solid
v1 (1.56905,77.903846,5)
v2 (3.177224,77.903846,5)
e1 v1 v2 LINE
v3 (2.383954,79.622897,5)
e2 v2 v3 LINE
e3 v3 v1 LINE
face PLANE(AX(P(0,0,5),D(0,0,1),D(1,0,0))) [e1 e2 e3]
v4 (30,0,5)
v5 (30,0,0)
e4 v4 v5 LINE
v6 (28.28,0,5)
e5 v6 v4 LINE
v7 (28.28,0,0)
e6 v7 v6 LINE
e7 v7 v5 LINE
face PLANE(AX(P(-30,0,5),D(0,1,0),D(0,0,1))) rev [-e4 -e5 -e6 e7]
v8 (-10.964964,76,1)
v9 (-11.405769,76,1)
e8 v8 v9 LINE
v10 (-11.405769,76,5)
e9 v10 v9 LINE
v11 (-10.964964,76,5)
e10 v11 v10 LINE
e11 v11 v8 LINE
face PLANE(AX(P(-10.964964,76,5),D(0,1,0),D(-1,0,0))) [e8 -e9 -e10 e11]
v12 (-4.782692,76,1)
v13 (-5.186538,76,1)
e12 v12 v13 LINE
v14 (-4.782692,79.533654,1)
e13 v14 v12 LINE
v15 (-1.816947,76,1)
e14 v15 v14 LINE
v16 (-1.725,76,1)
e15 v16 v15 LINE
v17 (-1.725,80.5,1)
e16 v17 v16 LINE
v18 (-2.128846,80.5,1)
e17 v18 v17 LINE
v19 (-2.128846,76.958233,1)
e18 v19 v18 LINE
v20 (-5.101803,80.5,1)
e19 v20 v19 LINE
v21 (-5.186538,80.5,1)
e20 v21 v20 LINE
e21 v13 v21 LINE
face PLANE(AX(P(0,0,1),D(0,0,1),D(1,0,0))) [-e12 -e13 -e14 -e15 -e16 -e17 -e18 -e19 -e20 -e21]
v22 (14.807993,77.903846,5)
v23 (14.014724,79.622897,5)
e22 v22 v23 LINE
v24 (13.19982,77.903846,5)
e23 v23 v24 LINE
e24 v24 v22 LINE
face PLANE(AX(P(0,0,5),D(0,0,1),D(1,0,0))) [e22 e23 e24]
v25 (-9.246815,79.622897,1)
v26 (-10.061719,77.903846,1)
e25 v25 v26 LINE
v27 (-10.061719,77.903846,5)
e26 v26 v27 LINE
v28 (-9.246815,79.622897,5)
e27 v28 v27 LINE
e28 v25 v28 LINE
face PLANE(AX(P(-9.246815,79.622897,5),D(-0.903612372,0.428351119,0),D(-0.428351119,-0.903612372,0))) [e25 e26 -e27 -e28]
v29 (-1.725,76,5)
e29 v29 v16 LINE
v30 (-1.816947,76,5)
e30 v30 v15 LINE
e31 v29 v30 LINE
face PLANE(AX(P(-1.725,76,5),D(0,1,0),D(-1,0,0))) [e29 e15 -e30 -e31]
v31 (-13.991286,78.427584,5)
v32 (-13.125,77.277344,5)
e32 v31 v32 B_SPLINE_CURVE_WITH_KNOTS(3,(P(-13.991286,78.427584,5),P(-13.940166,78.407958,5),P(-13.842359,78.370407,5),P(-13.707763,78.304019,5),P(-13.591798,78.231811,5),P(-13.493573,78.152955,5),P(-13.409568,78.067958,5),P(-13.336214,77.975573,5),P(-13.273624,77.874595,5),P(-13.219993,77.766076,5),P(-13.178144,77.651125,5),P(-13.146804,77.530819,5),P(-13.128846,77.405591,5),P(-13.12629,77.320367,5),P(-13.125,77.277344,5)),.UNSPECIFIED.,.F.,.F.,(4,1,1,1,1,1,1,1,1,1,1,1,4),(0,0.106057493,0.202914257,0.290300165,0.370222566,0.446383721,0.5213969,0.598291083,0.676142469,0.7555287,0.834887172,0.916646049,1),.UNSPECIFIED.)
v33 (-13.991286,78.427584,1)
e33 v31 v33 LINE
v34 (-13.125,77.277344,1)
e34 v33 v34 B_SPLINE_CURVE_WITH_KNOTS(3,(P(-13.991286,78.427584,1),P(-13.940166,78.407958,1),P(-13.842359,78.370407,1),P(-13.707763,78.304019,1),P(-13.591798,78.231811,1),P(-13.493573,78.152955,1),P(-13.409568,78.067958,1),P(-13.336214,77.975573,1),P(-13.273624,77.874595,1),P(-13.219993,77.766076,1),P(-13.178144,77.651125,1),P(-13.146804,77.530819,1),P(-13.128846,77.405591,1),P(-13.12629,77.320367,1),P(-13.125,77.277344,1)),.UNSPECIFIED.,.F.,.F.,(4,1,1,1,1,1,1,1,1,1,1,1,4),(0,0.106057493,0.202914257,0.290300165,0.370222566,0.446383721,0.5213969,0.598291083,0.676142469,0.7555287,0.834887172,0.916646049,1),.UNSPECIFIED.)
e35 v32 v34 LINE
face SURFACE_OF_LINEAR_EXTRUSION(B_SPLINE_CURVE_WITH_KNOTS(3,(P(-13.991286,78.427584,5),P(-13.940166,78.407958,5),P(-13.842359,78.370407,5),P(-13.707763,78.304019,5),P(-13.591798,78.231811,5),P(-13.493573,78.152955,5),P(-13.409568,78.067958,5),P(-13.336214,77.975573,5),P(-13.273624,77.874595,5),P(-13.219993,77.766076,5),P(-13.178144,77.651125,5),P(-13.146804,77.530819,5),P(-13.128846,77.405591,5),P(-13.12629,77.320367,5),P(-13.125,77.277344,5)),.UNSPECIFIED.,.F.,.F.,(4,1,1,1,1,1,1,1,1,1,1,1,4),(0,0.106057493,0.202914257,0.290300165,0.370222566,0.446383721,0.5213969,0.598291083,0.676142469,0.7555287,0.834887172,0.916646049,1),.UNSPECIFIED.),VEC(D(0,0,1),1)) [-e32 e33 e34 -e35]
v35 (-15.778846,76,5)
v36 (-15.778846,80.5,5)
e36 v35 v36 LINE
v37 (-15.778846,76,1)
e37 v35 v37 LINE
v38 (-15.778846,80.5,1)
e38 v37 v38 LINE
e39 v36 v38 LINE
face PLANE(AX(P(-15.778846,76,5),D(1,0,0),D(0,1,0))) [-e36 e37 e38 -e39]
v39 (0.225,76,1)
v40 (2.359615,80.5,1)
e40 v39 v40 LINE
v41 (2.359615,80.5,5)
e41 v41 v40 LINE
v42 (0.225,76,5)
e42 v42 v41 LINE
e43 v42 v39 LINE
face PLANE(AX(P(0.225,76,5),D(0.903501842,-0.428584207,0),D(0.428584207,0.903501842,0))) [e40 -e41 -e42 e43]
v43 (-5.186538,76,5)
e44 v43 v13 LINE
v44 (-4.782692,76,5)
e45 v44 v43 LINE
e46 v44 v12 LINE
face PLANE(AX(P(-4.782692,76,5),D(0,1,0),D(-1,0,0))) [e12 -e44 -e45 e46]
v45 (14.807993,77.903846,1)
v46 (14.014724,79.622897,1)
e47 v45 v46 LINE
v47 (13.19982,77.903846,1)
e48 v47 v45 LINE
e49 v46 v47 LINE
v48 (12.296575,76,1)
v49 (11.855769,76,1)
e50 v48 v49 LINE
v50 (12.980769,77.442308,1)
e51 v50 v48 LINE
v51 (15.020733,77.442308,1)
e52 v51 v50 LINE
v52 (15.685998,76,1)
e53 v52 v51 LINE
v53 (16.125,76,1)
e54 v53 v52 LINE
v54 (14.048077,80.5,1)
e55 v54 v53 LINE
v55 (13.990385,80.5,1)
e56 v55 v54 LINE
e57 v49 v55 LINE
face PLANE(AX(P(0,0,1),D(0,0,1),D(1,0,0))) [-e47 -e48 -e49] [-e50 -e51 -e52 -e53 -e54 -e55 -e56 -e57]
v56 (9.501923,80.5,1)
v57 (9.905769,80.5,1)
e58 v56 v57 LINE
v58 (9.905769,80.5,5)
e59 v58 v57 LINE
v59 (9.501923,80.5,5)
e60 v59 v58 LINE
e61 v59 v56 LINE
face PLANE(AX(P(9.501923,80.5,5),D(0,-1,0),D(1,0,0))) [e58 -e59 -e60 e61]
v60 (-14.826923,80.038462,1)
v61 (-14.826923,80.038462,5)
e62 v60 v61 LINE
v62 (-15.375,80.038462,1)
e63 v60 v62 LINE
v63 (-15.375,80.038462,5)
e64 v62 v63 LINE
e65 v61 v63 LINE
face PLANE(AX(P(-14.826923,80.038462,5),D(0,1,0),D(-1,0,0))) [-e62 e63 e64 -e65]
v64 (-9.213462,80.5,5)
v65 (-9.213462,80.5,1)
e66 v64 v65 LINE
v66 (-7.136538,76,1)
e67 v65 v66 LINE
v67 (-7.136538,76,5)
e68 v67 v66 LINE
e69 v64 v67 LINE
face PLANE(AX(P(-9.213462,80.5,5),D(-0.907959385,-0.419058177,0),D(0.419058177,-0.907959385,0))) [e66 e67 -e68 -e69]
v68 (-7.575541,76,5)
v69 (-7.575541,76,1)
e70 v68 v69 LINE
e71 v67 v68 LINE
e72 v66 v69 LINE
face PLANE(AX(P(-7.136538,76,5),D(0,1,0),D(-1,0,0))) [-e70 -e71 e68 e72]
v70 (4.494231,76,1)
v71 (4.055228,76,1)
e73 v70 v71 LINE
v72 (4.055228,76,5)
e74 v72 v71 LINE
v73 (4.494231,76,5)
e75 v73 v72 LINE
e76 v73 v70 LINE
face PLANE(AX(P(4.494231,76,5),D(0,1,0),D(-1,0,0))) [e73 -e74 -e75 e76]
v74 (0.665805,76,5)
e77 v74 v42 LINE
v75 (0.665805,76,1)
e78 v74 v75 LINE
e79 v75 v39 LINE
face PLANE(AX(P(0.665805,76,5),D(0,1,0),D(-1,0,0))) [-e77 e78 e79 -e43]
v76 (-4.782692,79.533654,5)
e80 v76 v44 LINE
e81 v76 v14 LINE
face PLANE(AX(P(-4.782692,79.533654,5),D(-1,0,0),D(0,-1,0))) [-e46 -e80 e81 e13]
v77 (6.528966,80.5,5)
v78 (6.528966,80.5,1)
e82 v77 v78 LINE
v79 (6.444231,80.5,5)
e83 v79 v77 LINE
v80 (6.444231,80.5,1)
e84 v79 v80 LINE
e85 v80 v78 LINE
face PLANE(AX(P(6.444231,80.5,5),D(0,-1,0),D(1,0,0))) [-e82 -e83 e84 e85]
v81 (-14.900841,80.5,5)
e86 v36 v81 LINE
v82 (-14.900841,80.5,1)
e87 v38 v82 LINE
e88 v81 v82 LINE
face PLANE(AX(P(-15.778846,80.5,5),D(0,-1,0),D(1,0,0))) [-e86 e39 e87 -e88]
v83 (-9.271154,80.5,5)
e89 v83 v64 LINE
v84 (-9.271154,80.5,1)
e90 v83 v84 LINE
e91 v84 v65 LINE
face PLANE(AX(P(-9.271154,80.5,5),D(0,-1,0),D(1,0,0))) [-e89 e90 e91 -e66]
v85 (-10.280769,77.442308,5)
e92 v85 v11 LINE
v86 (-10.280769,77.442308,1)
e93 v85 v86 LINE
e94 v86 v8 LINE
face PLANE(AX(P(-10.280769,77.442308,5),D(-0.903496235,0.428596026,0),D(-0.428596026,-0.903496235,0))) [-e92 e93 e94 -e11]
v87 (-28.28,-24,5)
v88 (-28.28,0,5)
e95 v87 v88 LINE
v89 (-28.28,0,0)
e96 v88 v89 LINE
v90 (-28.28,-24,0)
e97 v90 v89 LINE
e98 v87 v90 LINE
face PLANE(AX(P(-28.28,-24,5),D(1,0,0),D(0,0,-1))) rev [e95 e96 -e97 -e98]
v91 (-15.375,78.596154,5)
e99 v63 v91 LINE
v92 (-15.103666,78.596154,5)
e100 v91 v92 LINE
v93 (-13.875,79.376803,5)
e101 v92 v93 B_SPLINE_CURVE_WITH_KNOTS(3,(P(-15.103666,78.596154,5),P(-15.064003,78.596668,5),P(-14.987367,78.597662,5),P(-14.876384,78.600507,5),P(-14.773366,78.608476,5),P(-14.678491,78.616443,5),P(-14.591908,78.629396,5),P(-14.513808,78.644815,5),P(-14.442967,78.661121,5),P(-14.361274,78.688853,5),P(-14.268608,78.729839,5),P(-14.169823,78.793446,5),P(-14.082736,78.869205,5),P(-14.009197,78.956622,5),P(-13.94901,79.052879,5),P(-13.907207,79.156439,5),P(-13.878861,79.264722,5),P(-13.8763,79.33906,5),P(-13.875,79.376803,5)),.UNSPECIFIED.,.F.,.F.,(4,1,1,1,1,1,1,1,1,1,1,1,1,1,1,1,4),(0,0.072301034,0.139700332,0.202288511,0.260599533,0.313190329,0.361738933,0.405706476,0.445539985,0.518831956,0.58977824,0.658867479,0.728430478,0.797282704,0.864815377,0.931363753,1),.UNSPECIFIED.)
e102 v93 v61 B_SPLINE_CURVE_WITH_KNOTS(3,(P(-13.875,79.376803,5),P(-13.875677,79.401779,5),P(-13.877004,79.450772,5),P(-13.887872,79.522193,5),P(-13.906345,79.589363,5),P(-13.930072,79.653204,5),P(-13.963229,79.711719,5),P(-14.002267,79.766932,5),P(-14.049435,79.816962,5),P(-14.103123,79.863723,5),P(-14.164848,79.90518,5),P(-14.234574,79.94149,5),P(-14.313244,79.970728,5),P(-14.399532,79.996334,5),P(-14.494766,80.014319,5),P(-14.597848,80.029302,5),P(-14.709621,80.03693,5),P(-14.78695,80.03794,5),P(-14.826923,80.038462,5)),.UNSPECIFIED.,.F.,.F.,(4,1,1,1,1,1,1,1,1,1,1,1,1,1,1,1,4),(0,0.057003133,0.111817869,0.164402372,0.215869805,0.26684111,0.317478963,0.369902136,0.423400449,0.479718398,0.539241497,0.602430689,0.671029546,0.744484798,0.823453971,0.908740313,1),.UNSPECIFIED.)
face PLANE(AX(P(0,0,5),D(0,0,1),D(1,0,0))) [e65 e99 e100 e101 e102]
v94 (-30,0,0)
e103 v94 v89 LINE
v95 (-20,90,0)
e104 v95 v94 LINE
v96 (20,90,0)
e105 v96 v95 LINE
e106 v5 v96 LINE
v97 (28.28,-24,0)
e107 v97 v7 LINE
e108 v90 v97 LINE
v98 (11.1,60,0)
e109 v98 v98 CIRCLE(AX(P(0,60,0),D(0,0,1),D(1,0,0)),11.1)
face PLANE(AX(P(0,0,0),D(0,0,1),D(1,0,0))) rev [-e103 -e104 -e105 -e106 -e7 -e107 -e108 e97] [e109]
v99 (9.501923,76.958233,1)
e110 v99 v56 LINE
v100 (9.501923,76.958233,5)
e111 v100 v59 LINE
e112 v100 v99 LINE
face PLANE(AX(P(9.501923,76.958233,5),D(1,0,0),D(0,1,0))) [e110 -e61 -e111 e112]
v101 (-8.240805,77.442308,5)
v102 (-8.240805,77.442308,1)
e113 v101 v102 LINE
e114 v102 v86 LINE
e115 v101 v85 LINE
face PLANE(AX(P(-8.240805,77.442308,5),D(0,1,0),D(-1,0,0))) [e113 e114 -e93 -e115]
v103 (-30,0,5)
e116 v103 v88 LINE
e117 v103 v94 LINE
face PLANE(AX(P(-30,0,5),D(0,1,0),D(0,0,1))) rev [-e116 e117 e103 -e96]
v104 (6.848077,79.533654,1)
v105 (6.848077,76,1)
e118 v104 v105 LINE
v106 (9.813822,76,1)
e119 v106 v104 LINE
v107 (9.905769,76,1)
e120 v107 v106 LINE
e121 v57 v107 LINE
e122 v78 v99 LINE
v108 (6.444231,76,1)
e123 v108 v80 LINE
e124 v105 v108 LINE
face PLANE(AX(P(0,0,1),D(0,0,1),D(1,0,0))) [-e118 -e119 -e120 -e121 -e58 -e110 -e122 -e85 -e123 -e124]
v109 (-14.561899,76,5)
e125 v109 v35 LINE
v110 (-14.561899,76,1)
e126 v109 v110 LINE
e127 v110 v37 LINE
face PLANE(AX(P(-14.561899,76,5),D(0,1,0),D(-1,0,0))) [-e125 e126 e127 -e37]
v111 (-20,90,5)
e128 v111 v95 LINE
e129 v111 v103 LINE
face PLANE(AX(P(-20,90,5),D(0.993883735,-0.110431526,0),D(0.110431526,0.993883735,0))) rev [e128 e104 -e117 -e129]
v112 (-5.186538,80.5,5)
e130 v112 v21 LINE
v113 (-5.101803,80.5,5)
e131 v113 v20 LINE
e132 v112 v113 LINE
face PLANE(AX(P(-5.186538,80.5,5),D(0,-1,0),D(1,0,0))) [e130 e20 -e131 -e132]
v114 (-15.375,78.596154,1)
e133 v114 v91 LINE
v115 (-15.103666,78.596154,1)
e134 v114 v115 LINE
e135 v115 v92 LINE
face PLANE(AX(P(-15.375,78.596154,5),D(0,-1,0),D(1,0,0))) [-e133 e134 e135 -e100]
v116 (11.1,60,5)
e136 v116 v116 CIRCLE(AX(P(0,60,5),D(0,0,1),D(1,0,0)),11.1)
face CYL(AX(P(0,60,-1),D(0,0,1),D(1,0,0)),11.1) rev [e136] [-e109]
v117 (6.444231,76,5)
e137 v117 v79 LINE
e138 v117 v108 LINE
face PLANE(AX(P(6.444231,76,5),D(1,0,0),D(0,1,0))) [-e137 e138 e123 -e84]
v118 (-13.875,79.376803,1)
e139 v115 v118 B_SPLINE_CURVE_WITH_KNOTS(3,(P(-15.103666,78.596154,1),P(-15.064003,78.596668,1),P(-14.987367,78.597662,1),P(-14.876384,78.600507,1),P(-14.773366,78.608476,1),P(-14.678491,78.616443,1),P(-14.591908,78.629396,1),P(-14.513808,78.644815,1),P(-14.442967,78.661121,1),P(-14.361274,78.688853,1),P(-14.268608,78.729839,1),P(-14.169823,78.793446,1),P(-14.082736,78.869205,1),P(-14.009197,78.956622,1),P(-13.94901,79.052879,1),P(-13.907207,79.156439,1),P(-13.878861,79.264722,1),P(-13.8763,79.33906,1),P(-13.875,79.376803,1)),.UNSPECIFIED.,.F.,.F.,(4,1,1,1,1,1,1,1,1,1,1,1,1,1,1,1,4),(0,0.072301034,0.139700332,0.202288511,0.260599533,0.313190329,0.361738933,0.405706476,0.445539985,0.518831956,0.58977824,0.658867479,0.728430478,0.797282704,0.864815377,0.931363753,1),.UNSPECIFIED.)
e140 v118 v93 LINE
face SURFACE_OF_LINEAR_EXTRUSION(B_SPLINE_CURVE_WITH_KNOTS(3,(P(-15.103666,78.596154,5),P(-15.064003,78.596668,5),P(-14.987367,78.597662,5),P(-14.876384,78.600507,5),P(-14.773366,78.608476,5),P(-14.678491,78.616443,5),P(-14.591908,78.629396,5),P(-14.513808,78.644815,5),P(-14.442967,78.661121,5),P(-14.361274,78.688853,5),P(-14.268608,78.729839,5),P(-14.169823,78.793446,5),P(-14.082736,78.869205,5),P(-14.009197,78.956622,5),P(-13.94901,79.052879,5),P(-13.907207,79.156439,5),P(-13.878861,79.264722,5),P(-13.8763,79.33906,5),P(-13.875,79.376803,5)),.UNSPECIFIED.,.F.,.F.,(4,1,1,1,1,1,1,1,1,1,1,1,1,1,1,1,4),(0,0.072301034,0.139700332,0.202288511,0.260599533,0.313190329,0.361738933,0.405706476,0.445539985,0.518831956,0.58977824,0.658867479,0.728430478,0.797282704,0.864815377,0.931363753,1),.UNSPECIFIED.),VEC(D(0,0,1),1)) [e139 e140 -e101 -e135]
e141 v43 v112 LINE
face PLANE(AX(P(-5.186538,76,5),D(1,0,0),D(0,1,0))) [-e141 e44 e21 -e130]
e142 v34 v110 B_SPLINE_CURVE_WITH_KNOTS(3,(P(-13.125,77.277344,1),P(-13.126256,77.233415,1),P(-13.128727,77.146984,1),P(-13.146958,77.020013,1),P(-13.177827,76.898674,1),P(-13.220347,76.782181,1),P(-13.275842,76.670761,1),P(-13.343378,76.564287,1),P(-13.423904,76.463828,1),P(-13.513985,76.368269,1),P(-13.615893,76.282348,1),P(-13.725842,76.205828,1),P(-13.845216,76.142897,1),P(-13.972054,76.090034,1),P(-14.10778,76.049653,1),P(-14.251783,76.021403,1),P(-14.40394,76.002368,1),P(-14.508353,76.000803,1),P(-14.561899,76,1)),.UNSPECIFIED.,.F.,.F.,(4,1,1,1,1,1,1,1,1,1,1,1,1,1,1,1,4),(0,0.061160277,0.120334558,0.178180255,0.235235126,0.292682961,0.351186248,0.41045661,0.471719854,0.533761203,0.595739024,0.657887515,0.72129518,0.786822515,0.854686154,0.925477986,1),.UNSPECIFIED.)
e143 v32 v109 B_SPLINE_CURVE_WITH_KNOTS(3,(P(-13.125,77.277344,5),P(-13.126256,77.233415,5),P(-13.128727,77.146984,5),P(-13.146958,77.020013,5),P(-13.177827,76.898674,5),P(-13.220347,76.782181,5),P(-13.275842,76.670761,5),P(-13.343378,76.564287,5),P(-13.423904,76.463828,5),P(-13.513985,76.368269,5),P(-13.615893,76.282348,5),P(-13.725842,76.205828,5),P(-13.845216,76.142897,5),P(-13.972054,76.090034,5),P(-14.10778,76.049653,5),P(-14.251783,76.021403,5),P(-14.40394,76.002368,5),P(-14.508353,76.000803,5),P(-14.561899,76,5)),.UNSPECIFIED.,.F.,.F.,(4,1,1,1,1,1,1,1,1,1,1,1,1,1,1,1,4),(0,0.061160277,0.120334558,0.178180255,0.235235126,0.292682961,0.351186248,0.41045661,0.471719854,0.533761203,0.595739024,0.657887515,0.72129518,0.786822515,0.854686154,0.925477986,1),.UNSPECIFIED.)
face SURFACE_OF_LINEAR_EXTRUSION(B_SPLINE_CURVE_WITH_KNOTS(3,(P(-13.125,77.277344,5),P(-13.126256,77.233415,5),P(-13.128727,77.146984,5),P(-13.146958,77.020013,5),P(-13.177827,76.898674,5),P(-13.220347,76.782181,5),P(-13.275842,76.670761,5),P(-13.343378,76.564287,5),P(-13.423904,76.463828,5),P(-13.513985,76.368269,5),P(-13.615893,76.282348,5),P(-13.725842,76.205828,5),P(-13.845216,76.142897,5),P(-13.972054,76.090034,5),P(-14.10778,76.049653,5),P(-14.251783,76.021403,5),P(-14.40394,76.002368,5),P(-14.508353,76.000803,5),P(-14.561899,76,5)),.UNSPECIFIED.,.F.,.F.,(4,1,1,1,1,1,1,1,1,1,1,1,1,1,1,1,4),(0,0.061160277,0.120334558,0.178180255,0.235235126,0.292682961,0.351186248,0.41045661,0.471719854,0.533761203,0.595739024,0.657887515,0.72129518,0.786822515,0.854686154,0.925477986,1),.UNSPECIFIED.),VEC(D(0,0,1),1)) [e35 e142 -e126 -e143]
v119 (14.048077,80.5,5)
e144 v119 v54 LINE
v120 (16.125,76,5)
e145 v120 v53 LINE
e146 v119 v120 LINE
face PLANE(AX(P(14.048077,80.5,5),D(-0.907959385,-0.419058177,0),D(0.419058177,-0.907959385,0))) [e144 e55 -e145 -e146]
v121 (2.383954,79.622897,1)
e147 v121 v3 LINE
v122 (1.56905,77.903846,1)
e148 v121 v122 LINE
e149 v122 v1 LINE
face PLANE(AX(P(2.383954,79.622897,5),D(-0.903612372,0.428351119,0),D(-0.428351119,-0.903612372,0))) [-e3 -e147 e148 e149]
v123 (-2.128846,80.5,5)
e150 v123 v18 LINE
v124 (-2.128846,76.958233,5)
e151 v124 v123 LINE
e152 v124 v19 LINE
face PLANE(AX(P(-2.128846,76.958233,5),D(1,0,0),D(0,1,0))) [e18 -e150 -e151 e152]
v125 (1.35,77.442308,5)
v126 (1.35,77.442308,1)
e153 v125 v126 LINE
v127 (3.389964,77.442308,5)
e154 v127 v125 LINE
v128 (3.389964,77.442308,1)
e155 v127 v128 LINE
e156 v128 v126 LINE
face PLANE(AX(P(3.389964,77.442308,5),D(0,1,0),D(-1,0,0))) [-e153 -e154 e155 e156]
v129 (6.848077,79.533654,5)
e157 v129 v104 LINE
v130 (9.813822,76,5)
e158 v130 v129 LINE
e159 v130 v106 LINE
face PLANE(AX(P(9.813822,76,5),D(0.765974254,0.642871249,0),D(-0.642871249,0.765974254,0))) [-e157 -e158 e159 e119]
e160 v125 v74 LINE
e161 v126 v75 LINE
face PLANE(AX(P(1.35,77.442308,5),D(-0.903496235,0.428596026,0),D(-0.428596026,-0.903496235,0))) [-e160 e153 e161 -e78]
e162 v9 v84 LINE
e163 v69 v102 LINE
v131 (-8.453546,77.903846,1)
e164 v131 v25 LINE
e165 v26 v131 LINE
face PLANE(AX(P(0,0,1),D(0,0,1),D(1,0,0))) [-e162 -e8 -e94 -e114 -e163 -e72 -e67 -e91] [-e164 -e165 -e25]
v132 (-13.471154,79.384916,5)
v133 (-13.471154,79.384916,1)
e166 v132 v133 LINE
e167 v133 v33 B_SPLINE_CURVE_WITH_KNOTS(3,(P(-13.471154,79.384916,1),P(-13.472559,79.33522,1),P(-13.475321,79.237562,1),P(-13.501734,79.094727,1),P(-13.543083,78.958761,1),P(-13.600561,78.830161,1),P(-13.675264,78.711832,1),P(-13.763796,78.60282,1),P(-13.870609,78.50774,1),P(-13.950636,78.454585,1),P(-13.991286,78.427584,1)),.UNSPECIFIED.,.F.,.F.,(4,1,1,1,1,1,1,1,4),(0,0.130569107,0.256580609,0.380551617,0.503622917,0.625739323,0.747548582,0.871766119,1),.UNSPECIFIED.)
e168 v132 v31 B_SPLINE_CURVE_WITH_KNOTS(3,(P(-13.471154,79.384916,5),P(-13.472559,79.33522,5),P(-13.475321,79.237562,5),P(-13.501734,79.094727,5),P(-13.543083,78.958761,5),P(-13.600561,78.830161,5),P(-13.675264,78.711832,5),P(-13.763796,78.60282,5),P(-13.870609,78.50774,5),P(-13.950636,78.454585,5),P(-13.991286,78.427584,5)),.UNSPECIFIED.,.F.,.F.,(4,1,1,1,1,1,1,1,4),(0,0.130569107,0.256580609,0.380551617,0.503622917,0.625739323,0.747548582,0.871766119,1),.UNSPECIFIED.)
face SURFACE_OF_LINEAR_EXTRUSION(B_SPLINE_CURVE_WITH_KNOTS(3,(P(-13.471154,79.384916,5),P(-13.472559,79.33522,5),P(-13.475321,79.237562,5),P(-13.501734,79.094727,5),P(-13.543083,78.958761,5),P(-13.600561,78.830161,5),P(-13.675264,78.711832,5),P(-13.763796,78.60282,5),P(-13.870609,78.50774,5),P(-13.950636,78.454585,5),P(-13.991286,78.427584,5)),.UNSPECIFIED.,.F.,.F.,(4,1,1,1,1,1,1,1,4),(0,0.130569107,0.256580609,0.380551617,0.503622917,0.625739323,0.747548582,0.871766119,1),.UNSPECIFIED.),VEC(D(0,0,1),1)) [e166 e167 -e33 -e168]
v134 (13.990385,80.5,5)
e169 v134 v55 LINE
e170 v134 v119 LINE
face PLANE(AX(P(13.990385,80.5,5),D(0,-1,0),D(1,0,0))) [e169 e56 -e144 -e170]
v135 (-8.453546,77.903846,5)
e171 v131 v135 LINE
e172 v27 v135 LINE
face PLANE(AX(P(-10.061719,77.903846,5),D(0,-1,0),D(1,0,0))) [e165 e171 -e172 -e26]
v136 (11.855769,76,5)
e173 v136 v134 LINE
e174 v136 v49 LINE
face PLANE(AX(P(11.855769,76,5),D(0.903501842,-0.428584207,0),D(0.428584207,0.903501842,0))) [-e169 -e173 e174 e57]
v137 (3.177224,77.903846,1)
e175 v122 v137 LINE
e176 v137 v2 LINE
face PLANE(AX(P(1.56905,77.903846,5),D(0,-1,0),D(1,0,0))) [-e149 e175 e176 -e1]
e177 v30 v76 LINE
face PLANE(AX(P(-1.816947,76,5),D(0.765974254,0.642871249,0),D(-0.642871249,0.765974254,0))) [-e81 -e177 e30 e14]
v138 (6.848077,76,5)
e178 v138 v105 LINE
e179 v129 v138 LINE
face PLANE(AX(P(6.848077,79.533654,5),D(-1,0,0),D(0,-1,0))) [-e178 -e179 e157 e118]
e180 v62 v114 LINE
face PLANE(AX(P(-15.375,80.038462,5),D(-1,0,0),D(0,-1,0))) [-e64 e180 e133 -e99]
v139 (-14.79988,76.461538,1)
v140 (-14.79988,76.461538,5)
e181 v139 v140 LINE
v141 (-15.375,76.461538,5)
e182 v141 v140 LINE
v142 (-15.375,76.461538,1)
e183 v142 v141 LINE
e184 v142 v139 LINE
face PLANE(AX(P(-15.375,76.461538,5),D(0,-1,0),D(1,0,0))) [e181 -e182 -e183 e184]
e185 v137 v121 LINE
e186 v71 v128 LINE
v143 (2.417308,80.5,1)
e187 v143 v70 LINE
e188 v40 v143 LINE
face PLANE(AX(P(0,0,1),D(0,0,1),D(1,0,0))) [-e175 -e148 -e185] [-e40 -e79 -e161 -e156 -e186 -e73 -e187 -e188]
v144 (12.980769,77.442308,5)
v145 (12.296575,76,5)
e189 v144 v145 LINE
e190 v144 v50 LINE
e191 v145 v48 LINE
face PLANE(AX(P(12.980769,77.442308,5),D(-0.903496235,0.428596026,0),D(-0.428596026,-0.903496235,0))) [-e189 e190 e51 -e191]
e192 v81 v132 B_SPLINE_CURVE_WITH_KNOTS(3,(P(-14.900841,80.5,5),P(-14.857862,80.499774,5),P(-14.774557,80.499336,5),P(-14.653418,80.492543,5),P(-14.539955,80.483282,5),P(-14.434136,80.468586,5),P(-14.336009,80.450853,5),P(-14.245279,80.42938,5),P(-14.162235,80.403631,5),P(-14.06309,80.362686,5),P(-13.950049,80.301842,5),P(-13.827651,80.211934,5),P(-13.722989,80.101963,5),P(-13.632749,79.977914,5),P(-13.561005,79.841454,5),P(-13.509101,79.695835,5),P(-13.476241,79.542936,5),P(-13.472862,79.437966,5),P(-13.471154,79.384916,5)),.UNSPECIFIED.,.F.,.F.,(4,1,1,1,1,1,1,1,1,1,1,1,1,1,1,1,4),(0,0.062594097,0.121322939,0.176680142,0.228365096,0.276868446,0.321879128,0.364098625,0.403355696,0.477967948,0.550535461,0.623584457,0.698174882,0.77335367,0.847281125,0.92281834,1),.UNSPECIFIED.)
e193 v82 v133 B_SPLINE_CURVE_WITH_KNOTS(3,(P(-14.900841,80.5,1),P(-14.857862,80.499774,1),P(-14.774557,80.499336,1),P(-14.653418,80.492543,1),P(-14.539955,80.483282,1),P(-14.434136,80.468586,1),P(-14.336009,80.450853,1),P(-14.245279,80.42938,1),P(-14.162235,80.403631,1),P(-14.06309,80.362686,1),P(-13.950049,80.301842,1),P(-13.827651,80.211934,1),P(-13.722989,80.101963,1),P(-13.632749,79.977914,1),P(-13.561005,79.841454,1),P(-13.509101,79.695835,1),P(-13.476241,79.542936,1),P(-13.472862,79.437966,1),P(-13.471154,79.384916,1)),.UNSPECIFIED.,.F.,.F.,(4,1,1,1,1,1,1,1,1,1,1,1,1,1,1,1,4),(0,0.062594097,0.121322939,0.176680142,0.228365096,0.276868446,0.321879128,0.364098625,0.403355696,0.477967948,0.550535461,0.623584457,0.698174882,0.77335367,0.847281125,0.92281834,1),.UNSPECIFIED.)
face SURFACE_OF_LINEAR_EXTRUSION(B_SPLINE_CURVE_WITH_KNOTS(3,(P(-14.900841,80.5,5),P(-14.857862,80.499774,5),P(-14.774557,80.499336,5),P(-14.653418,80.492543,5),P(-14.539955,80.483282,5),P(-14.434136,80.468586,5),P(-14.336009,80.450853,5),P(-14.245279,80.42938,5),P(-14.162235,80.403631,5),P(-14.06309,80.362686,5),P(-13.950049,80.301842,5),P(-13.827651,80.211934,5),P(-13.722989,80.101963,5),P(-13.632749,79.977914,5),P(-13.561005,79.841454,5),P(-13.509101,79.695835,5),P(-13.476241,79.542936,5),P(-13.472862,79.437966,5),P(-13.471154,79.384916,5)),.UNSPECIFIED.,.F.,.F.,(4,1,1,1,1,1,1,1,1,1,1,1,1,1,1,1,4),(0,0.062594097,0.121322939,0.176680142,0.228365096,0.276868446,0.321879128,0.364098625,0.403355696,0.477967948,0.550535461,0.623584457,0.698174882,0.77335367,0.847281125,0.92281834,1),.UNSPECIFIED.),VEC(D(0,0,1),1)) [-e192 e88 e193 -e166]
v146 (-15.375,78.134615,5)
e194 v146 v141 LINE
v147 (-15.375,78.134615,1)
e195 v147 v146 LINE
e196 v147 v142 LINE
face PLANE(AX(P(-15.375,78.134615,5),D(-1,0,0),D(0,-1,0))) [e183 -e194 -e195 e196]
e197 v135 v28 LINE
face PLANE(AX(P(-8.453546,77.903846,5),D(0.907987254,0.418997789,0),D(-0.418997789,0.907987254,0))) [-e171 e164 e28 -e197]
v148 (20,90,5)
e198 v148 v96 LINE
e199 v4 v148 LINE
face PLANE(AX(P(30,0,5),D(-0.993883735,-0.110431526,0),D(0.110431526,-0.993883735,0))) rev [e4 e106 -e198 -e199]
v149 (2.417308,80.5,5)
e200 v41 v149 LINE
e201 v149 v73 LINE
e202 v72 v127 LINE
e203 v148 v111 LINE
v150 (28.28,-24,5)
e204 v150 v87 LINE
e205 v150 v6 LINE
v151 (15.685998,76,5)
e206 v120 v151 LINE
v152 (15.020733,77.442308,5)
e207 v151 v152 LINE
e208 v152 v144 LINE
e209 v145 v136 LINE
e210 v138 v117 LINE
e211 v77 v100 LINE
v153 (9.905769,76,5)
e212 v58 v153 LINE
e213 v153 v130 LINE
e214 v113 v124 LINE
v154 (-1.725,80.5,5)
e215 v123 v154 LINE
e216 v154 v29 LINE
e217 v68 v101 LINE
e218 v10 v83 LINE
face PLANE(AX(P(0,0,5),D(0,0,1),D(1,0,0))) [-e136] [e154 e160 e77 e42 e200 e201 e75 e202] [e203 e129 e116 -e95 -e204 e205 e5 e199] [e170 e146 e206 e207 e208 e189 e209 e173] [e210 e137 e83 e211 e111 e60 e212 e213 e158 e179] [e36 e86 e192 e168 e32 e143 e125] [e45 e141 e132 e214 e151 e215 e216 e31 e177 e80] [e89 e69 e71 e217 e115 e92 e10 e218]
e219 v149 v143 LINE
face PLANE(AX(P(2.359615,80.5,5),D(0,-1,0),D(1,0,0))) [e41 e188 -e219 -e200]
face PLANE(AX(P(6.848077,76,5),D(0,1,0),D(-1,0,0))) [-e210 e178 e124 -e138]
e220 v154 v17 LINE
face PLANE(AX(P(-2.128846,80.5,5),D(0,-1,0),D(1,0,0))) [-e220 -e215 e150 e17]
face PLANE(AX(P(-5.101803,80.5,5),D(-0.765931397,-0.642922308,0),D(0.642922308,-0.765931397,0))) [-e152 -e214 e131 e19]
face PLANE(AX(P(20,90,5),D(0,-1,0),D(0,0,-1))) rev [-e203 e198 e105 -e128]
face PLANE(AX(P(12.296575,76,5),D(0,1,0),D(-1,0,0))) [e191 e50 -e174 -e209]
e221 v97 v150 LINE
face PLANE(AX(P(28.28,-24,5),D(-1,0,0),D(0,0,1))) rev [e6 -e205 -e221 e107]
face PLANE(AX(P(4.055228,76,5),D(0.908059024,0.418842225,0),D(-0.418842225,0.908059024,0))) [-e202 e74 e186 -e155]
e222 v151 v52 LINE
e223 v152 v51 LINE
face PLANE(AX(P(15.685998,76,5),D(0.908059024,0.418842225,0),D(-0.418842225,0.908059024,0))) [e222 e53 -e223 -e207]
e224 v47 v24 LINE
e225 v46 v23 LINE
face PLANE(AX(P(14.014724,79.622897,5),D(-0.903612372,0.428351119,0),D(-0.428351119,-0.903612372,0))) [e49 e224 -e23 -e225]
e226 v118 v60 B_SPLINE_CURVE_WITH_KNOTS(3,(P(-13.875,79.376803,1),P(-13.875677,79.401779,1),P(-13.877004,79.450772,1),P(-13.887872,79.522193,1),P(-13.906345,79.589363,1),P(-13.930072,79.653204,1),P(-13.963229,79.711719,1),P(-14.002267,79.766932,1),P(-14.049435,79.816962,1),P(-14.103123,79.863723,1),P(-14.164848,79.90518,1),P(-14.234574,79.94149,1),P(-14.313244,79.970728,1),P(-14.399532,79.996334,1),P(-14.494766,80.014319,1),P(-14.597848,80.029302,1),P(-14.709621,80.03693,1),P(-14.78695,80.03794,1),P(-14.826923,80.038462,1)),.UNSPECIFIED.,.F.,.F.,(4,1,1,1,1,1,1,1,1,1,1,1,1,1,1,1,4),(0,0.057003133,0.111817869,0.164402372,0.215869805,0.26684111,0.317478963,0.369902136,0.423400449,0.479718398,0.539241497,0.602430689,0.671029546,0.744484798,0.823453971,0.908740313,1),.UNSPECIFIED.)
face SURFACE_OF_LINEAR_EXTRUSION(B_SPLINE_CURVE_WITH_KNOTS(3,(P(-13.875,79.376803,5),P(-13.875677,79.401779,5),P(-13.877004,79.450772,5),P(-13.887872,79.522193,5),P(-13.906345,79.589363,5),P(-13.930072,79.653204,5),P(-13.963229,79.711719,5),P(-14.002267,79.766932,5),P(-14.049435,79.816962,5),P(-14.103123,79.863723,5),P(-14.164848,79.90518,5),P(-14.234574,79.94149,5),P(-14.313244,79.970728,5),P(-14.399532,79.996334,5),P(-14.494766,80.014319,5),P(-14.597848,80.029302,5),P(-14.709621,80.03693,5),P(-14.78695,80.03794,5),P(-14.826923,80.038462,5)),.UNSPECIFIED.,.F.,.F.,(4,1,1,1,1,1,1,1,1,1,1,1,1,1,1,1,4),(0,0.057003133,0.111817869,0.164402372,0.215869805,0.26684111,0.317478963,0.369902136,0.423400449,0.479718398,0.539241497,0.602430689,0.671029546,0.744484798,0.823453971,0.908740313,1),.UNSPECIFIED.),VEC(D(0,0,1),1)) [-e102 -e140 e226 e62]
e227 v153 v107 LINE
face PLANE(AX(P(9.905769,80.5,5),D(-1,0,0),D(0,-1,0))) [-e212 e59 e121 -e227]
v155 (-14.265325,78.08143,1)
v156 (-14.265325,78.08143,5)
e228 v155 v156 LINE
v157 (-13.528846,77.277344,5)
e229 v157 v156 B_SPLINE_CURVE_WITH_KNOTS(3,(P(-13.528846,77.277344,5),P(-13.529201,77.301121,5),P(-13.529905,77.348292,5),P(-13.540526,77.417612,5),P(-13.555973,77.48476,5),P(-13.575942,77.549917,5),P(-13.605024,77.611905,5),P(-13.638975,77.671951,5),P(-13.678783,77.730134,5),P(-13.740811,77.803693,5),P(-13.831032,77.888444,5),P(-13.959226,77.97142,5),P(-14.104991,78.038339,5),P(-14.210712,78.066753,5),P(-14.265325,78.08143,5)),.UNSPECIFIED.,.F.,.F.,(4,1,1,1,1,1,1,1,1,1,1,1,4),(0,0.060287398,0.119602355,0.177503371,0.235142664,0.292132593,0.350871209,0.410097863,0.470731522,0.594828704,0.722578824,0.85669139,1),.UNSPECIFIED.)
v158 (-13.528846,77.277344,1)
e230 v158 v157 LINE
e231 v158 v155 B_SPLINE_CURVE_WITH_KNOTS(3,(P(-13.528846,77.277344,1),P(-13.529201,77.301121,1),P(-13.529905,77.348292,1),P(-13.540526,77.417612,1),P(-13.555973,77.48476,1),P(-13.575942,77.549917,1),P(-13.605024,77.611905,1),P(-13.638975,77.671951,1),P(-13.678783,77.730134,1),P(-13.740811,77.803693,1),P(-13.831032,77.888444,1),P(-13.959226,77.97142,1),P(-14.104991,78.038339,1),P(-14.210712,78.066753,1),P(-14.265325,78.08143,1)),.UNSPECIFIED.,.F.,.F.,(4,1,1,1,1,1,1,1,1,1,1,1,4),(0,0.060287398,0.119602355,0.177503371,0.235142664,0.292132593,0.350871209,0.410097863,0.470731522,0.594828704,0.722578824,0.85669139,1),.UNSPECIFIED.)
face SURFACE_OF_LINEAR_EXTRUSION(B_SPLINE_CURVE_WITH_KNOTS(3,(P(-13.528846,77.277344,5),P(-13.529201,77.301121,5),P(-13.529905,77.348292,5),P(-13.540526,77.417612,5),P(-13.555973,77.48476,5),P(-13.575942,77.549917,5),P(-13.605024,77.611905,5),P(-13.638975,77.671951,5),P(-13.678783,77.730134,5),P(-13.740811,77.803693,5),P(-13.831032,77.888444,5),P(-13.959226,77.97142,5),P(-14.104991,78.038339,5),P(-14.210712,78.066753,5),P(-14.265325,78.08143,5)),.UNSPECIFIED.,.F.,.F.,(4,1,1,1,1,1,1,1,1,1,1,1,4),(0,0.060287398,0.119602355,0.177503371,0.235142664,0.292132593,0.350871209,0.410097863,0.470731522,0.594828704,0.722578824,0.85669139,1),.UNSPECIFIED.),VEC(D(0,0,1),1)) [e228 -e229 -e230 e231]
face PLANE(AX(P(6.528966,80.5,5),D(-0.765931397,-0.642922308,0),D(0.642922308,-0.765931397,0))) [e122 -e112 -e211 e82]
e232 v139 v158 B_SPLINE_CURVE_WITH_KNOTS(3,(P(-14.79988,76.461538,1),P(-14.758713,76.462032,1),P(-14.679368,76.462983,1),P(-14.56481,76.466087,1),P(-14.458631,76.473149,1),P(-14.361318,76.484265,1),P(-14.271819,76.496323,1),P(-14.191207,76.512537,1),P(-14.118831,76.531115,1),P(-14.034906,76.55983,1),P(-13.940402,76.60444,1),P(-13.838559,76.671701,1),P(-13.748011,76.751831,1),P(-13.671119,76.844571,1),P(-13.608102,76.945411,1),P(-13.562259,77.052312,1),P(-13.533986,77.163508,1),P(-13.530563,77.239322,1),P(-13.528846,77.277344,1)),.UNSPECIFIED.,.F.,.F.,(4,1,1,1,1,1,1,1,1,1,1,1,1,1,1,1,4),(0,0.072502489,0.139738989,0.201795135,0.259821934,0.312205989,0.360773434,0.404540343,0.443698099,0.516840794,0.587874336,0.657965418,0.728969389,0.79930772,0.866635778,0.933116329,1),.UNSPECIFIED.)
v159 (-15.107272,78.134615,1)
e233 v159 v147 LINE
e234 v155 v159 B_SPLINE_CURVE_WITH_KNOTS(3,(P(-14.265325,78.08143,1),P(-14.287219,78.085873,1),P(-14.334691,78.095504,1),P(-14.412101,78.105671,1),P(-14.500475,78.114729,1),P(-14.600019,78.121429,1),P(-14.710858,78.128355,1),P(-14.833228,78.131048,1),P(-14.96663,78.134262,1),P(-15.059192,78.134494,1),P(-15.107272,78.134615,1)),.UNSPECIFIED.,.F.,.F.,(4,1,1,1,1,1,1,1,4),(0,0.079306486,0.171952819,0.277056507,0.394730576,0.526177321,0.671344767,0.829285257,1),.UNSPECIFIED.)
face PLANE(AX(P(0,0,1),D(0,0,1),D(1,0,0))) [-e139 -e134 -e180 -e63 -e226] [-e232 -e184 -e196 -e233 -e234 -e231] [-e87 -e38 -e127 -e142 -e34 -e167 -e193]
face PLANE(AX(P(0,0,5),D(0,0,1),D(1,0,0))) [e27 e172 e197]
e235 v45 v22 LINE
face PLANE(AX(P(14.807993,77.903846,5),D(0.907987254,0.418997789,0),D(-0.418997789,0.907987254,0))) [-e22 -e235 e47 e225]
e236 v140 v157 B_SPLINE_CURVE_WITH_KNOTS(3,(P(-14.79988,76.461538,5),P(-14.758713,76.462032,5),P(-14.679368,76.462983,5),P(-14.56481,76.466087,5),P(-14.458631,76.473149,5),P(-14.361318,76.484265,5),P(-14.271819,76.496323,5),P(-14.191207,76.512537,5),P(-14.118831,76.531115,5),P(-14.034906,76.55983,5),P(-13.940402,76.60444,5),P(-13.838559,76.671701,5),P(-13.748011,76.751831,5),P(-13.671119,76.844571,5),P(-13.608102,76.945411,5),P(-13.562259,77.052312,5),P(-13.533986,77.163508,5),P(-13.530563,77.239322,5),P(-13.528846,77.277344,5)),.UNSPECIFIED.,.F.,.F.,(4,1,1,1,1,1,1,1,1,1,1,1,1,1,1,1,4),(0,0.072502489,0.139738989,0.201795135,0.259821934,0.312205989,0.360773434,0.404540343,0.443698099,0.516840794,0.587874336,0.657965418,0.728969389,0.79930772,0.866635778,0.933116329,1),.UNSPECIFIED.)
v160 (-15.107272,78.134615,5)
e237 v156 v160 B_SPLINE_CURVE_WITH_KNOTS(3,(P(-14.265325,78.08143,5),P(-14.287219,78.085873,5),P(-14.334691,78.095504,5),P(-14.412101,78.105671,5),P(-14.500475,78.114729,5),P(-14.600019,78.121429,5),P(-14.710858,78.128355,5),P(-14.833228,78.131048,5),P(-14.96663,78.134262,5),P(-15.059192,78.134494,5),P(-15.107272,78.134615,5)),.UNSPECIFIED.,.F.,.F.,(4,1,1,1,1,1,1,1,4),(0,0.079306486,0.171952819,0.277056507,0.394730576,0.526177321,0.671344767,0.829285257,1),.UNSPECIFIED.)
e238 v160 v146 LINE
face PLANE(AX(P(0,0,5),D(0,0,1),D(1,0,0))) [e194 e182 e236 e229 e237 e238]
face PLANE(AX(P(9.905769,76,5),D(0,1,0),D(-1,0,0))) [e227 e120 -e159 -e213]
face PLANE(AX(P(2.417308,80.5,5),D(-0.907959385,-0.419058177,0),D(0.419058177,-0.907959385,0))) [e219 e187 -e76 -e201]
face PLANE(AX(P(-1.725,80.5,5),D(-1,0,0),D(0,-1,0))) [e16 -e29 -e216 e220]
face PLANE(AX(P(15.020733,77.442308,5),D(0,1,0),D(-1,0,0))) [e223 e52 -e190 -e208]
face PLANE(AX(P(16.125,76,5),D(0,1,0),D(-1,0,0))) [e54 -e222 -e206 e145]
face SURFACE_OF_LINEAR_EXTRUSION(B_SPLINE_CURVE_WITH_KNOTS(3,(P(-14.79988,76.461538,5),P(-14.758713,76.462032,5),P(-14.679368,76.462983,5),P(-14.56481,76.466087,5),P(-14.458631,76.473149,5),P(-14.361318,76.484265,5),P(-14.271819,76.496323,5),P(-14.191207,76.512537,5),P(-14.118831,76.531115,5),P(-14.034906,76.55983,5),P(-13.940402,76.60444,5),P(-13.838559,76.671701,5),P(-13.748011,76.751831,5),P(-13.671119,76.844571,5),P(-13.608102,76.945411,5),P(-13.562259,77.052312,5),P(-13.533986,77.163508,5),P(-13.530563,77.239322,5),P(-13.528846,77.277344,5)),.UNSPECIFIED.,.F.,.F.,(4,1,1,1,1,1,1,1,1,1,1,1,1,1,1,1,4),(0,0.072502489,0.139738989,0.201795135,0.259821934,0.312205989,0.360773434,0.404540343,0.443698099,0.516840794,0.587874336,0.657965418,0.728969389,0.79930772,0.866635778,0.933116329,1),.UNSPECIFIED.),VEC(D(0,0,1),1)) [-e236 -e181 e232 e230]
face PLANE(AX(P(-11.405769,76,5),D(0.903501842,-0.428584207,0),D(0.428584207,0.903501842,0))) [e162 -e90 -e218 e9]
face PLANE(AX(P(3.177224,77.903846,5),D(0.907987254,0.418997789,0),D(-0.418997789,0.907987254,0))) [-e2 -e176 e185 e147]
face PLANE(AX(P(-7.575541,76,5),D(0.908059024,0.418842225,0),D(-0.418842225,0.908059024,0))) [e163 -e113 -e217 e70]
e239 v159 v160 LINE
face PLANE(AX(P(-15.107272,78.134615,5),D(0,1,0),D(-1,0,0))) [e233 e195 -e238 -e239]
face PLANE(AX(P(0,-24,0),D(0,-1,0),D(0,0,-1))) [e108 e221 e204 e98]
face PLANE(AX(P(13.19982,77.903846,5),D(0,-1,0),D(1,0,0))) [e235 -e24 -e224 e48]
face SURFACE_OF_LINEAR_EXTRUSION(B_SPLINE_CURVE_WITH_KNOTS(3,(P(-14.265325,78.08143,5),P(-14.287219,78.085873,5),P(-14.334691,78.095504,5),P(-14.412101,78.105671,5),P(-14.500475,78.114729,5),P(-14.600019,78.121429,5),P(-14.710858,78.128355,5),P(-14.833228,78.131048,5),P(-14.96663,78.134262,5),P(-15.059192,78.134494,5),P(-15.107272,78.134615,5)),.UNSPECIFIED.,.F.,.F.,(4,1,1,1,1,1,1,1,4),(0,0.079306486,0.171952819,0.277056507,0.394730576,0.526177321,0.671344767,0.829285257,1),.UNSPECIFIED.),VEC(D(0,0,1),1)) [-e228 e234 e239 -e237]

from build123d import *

# Parameters (mm, degrees)
SKETCH1_R           = 5.25
BOSS_EXTRUDE1_DEPTH = 5
SKETCH3_R           = 11.1
CUT_EXTRUDE1_DEPTH  = 6
WRAP1_START         = -4
WRAP1_DEPTH         = 4
SKETCH5_W           = 56.56
SKETCH5_H           = 5
BOSS_EXTRUDE2_DEPTH = 24


# Read off the part's stored shape, not the designer's step: Wrap1
with BuildPart() as part:
    # Sketch1 → Boss-Extrude1 (new body)
    with BuildSketch(Plane.XY):
        Polygon((-30, 0), (30, 0), (20, 90), (-20, 90), align=None)
        with Locations((0, 60)):
            Circle(SKETCH1_R, mode=Mode.SUBTRACT)
    extrude(amount=BOSS_EXTRUDE1_DEPTH)

    # Sketch3 → Cut-Extrude1 (cut)
    with BuildSketch(Plane.XY.offset(5)):
        with Locations((0, 60)):
            Circle(SKETCH3_R)
    extrude(amount=-CUT_EXTRUDE1_DEPTH, mode=Mode.SUBTRACT)

    # Wrap1 outline → Wrap1 (cut)
    # profile 1 of 6: a face of its own
    with BuildSketch(Plane.XY.offset(5).offset(WRAP1_START)):
        with BuildLine():
            add(Edge.make_bspline(
                [(-14.900841346, 80.5), (-14.857861874, 80.499774035), (-14.774556961, 80.499336059), (-14.653417679, 80.492543462), (-14.539954922, 80.483281601), (-14.434135786, 80.468585767), (-14.336009169, 80.450853482), (-14.245279349, 80.429379719), (-14.162234842, 80.403631216), (-14.063089895, 80.362685997), (-13.950049046, 80.301841923), (-13.827651112, 80.211933768), (-13.722988519, 80.101963458), (-13.632748968, 79.97791433), (-13.561004671, 79.841454052), (-13.509101289, 79.695835095), (-13.476241164, 79.542935713), (-13.472861748, 79.437965912), (-13.471153846, 79.384915865)],
                knots=[0, 0, 0, 0, 0.062594097, 0.121322939, 0.176680142, 0.228365096, 0.276868446, 0.321879128, 0.364098625, 0.403355696, 0.477967948, 0.550535461, 0.623584457, 0.698174882, 0.77335367, 0.847281125, 0.92281834, 1, 1, 1, 1], degree=3))
            Line((-14.900841346, 80.5), (-15.778846154, 80.5))
            Line((-15.778846154, 80.5), (-15.778846154, 76))
            Line((-15.778846154, 76), (-14.561899038, 76))
            add(Edge.make_bspline(
                [(-13.125, 77.27734375), (-13.126255945, 77.233414914), (-13.128727052, 77.1469837), (-13.146958444, 77.020012812), (-13.177827296, 76.898673595), (-13.220347341, 76.782181218), (-13.275841746, 76.670761045), (-13.3433777, 76.564286848), (-13.423903996, 76.463828423), (-13.513984827, 76.368269479), (-13.6158933, 76.282348038), (-13.725842128, 76.205827844), (-13.845215968, 76.142897193), (-13.972054246, 76.090033736), (-14.107779795, 76.049653053), (-14.251783147, 76.021402601), (-14.403940107, 76.002367553), (-14.508352644, 76.000802575), (-14.561899038, 76)],
                knots=[0, 0, 0, 0, 0.061160277, 0.120334558, 0.178180255, 0.235235126, 0.292682961, 0.351186248, 0.41045661, 0.471719854, 0.533761203, 0.595739024, 0.657887515, 0.72129518, 0.786822515, 0.854686154, 0.925477986, 1, 1, 1, 1], degree=3))
            add(Edge.make_bspline(
                [(-13.991286058, 78.427584135), (-13.940165508, 78.407957707), (-13.842359233, 78.37040749), (-13.707762931, 78.304019037), (-13.59179813, 78.231810609), (-13.493573228, 78.152955373), (-13.409567672, 78.067958331), (-13.33621389, 77.975573184), (-13.273623552, 77.874594781), (-13.21999265, 77.76607595), (-13.178144249, 77.651124776), (-13.146803801, 77.530819492), (-13.128845652, 77.405591493), (-13.126290113, 77.320367434), (-13.125, 77.27734375)],
                knots=[0, 0, 0, 0, 0.106057493, 0.202914257, 0.290300165, 0.370222566, 0.446383721, 0.5213969, 0.598291083, 0.676142469, 0.7555287, 0.834887172, 0.916646049, 1, 1, 1, 1], degree=3))
            add(Edge.make_bspline(
                [(-13.471153846, 79.384915865), (-13.472559413, 79.335219722), (-13.475321484, 79.237562115), (-13.501733603, 79.094726831), (-13.543083034, 78.958760979), (-13.600561211, 78.830160769), (-13.675263778, 78.711831838), (-13.763795902, 78.602819638), (-13.870608933, 78.507739708), (-13.950635956, 78.454584548), (-13.991286058, 78.427584135)],
                knots=[0, 0, 0, 0, 0.130569107, 0.256580609, 0.380551617, 0.503622917, 0.625739323, 0.747548582, 0.871766119, 1, 1, 1, 1], degree=3))
        make_face()
        with BuildLine():
            add(Edge.make_bspline(
                [(-14.799879808, 76.461538462), (-14.758712617, 76.462031851), (-14.679368285, 76.462982794), (-14.56480956, 76.466087222), (-14.458631284, 76.473148719), (-14.361317967, 76.484264811), (-14.271818813, 76.496322817), (-14.191207481, 76.512537321), (-14.118830518, 76.531114556), (-14.034906408, 76.559829921), (-13.940401897, 76.604439669), (-13.838559368, 76.671700817), (-13.748011373, 76.751830784), (-13.671118897, 76.844570531), (-13.608102197, 76.945410809), (-13.562259469, 77.052311973), (-13.533985511, 77.163507651), (-13.530562721, 77.239321996), (-13.528846154, 77.27734375)],
                knots=[0, 0, 0, 0, 0.072502489, 0.139738989, 0.201795135, 0.259821934, 0.312205989, 0.360773434, 0.404540343, 0.443698099, 0.516840794, 0.587874336, 0.657965418, 0.728969389, 0.79930772, 0.866635778, 0.933116329, 1, 1, 1, 1], degree=3))
            Line((-14.799879808, 76.461538462), (-15.375, 76.461538462))
            Line((-15.375, 76.461538462), (-15.375, 78.134615385))
            Line((-15.375, 78.134615385), (-15.107271635, 78.134615385))
            add(Edge.make_bspline(
                [(-14.265324519, 78.081430288), (-14.287219071, 78.085872539), (-14.334690975, 78.095504255), (-14.412100722, 78.105671303), (-14.50047541, 78.114729237), (-14.60001911, 78.121429297), (-14.710857762, 78.128354852), (-14.833228087, 78.131048194), (-14.966630348, 78.134261528), (-15.05919197, 78.134494415), (-15.107271635, 78.134615385)],
                knots=[0, 0, 0, 0, 0.079306486, 0.171952819, 0.277056507, 0.394730576, 0.526177321, 0.671344767, 0.829285257, 1, 1, 1, 1], degree=3))
            add(Edge.make_bspline(
                [(-13.528846154, 77.27734375), (-13.529201145, 77.301120902), (-13.529905402, 77.348291679), (-13.540526192, 77.417612018), (-13.555972596, 77.484759569), (-13.575941583, 77.549916664), (-13.605023755, 77.611905291), (-13.638975027, 77.671951439), (-13.678782543, 77.730134484), (-13.740810757, 77.803693095), (-13.831031879, 77.88844354), (-13.959226305, 77.971420329), (-14.104990688, 78.038338938), (-14.21071175, 78.066752551), (-14.265324519, 78.081430288)],
                knots=[0, 0, 0, 0, 0.060287398, 0.119602355, 0.177503371, 0.235142664, 0.292132593, 0.350871209, 0.410097863, 0.470731522, 0.594828704, 0.722578824, 0.85669139, 1, 1, 1, 1], degree=3))
        make_face(mode=Mode.SUBTRACT)
        with BuildLine():
            add(Edge.make_bspline(
                [(-15.103665865, 78.596153846), (-15.064003128, 78.596668033), (-14.987366638, 78.597661546), (-14.876383914, 78.600507497), (-14.773366033, 78.60847641), (-14.678490819, 78.616443033), (-14.591907677, 78.629396074), (-14.513808427, 78.644814518), (-14.442967373, 78.66112111), (-14.361273672, 78.688853307), (-14.268608453, 78.72983889), (-14.169823033, 78.793445536), (-14.082735858, 78.869205419), (-14.009196616, 78.95662237), (-13.94901044, 79.052878894), (-13.907207092, 79.156439169), (-13.878860584, 79.264722196), (-13.876300043, 79.33905995), (-13.875, 79.376802885)],
                knots=[0, 0, 0, 0, 0.072301034, 0.139700332, 0.202288511, 0.260599533, 0.313190329, 0.361738933, 0.405706476, 0.445539985, 0.518831956, 0.58977824, 0.658867479, 0.728430478, 0.797282704, 0.864815377, 0.931363753, 1, 1, 1, 1], degree=3))
            Line((-15.103665865, 78.596153846), (-15.375, 78.596153846))
            Line((-15.375, 78.596153846), (-15.375, 80.038461538))
            Line((-15.375, 80.038461538), (-14.826923077, 80.038461538))
            add(Edge.make_bspline(
                [(-13.875, 79.376802885), (-13.875676517, 79.401778877), (-13.87700358, 79.450772012), (-13.887872112, 79.52219261), (-13.906344708, 79.589363149), (-13.930071656, 79.653204148), (-13.963228542, 79.711719384), (-14.00226728, 79.766932064), (-14.049434596, 79.816961931), (-14.10312257, 79.863722715), (-14.164847942, 79.905179965), (-14.234573889, 79.941489517), (-14.313243759, 79.970727659), (-14.399531715, 79.99633414), (-14.494765971, 80.01431909), (-14.59784754, 80.029302017), (-14.70962075, 80.036929828), (-14.786950167, 80.03793958), (-14.826923077, 80.038461538)],
                knots=[0, 0, 0, 0, 0.057003133, 0.111817869, 0.164402372, 0.215869805, 0.26684111, 0.317478963, 0.369902136, 0.423400449, 0.479718398, 0.539241497, 0.602430689, 0.671029546, 0.744484798, 0.823453971, 0.908740313, 1, 1, 1, 1], degree=3))
        make_face(mode=Mode.SUBTRACT)
    # profile 2 of 6: a face of its own
    with BuildSketch(Plane.XY.offset(5).offset(WRAP1_START)):
        Polygon((15.685997596, 76), (16.125, 76), (14.048076923, 80.5), (13.990384615, 80.5), (11.855769231, 76), (12.296574519, 76), (12.980769231, 77.442307692), (15.020733173, 77.442307692), align=None)
        Polygon((14.807992788, 77.903846154), (13.199819712, 77.903846154), (14.014723558, 79.622896635), align=None, mode=Mode.SUBTRACT)
    # profile 3 of 6: a face of its own
    with BuildSketch(Plane.XY.offset(5).offset(WRAP1_START)):
        Polygon((9.813822115, 76), (9.905769231, 76), (9.905769231, 80.5), (9.501923077, 80.5), (9.501923077, 76.958233173), (6.528966346, 80.5), (6.444230769, 80.5), (6.444230769, 76), (6.848076923, 76), (6.848076923, 79.533653846), align=None)
    # profile 4 of 6: a face of its own
    with BuildSketch(Plane.XY.offset(5).offset(WRAP1_START)):
        Polygon((4.055228365, 76), (4.494230769, 76), (2.417307692, 80.5), (2.359615385, 80.5), (0.225, 76), (0.665805288, 76), (1.35, 77.442307692), (3.389963942, 77.442307692), align=None)
        Polygon((3.177223558, 77.903846154), (1.569050481, 77.903846154), (2.383954327, 79.622896635), align=None, mode=Mode.SUBTRACT)
    # profile 5 of 6: a face of its own
    with BuildSketch(Plane.XY.offset(5).offset(WRAP1_START)):
        Polygon((-1.816947115, 76), (-1.725, 76), (-1.725, 80.5), (-2.128846154, 80.5), (-2.128846154, 76.958233173), (-5.101802885, 80.5), (-5.186538462, 80.5), (-5.186538462, 76), (-4.782692308, 76), (-4.782692308, 79.533653846), align=None)
    # profile 6 of 6: a face of its own
    with BuildSketch(Plane.XY.offset(5).offset(WRAP1_START)):
        Polygon((-7.575540865, 76), (-7.136538462, 76), (-9.213461538, 80.5), (-9.271153846, 80.5), (-11.405769231, 76), (-10.964963942, 76), (-10.280769231, 77.442307692), (-8.240805288, 77.442307692), align=None)
        Polygon((-8.453545673, 77.903846154), (-10.06171875, 77.903846154), (-9.246814904, 79.622896635), align=None, mode=Mode.SUBTRACT)
    extrude(amount=WRAP1_DEPTH, mode=Mode.SUBTRACT)

    # Sketch5 → Boss-Extrude2 (add)
    with BuildSketch(Plane.XZ):
        with Locations((0, 2.5)):
            Rectangle(SKETCH5_W, SKETCH5_H)
    extrude(amount=BOSS_EXTRUDE2_DEPTH)


solid = part.part
